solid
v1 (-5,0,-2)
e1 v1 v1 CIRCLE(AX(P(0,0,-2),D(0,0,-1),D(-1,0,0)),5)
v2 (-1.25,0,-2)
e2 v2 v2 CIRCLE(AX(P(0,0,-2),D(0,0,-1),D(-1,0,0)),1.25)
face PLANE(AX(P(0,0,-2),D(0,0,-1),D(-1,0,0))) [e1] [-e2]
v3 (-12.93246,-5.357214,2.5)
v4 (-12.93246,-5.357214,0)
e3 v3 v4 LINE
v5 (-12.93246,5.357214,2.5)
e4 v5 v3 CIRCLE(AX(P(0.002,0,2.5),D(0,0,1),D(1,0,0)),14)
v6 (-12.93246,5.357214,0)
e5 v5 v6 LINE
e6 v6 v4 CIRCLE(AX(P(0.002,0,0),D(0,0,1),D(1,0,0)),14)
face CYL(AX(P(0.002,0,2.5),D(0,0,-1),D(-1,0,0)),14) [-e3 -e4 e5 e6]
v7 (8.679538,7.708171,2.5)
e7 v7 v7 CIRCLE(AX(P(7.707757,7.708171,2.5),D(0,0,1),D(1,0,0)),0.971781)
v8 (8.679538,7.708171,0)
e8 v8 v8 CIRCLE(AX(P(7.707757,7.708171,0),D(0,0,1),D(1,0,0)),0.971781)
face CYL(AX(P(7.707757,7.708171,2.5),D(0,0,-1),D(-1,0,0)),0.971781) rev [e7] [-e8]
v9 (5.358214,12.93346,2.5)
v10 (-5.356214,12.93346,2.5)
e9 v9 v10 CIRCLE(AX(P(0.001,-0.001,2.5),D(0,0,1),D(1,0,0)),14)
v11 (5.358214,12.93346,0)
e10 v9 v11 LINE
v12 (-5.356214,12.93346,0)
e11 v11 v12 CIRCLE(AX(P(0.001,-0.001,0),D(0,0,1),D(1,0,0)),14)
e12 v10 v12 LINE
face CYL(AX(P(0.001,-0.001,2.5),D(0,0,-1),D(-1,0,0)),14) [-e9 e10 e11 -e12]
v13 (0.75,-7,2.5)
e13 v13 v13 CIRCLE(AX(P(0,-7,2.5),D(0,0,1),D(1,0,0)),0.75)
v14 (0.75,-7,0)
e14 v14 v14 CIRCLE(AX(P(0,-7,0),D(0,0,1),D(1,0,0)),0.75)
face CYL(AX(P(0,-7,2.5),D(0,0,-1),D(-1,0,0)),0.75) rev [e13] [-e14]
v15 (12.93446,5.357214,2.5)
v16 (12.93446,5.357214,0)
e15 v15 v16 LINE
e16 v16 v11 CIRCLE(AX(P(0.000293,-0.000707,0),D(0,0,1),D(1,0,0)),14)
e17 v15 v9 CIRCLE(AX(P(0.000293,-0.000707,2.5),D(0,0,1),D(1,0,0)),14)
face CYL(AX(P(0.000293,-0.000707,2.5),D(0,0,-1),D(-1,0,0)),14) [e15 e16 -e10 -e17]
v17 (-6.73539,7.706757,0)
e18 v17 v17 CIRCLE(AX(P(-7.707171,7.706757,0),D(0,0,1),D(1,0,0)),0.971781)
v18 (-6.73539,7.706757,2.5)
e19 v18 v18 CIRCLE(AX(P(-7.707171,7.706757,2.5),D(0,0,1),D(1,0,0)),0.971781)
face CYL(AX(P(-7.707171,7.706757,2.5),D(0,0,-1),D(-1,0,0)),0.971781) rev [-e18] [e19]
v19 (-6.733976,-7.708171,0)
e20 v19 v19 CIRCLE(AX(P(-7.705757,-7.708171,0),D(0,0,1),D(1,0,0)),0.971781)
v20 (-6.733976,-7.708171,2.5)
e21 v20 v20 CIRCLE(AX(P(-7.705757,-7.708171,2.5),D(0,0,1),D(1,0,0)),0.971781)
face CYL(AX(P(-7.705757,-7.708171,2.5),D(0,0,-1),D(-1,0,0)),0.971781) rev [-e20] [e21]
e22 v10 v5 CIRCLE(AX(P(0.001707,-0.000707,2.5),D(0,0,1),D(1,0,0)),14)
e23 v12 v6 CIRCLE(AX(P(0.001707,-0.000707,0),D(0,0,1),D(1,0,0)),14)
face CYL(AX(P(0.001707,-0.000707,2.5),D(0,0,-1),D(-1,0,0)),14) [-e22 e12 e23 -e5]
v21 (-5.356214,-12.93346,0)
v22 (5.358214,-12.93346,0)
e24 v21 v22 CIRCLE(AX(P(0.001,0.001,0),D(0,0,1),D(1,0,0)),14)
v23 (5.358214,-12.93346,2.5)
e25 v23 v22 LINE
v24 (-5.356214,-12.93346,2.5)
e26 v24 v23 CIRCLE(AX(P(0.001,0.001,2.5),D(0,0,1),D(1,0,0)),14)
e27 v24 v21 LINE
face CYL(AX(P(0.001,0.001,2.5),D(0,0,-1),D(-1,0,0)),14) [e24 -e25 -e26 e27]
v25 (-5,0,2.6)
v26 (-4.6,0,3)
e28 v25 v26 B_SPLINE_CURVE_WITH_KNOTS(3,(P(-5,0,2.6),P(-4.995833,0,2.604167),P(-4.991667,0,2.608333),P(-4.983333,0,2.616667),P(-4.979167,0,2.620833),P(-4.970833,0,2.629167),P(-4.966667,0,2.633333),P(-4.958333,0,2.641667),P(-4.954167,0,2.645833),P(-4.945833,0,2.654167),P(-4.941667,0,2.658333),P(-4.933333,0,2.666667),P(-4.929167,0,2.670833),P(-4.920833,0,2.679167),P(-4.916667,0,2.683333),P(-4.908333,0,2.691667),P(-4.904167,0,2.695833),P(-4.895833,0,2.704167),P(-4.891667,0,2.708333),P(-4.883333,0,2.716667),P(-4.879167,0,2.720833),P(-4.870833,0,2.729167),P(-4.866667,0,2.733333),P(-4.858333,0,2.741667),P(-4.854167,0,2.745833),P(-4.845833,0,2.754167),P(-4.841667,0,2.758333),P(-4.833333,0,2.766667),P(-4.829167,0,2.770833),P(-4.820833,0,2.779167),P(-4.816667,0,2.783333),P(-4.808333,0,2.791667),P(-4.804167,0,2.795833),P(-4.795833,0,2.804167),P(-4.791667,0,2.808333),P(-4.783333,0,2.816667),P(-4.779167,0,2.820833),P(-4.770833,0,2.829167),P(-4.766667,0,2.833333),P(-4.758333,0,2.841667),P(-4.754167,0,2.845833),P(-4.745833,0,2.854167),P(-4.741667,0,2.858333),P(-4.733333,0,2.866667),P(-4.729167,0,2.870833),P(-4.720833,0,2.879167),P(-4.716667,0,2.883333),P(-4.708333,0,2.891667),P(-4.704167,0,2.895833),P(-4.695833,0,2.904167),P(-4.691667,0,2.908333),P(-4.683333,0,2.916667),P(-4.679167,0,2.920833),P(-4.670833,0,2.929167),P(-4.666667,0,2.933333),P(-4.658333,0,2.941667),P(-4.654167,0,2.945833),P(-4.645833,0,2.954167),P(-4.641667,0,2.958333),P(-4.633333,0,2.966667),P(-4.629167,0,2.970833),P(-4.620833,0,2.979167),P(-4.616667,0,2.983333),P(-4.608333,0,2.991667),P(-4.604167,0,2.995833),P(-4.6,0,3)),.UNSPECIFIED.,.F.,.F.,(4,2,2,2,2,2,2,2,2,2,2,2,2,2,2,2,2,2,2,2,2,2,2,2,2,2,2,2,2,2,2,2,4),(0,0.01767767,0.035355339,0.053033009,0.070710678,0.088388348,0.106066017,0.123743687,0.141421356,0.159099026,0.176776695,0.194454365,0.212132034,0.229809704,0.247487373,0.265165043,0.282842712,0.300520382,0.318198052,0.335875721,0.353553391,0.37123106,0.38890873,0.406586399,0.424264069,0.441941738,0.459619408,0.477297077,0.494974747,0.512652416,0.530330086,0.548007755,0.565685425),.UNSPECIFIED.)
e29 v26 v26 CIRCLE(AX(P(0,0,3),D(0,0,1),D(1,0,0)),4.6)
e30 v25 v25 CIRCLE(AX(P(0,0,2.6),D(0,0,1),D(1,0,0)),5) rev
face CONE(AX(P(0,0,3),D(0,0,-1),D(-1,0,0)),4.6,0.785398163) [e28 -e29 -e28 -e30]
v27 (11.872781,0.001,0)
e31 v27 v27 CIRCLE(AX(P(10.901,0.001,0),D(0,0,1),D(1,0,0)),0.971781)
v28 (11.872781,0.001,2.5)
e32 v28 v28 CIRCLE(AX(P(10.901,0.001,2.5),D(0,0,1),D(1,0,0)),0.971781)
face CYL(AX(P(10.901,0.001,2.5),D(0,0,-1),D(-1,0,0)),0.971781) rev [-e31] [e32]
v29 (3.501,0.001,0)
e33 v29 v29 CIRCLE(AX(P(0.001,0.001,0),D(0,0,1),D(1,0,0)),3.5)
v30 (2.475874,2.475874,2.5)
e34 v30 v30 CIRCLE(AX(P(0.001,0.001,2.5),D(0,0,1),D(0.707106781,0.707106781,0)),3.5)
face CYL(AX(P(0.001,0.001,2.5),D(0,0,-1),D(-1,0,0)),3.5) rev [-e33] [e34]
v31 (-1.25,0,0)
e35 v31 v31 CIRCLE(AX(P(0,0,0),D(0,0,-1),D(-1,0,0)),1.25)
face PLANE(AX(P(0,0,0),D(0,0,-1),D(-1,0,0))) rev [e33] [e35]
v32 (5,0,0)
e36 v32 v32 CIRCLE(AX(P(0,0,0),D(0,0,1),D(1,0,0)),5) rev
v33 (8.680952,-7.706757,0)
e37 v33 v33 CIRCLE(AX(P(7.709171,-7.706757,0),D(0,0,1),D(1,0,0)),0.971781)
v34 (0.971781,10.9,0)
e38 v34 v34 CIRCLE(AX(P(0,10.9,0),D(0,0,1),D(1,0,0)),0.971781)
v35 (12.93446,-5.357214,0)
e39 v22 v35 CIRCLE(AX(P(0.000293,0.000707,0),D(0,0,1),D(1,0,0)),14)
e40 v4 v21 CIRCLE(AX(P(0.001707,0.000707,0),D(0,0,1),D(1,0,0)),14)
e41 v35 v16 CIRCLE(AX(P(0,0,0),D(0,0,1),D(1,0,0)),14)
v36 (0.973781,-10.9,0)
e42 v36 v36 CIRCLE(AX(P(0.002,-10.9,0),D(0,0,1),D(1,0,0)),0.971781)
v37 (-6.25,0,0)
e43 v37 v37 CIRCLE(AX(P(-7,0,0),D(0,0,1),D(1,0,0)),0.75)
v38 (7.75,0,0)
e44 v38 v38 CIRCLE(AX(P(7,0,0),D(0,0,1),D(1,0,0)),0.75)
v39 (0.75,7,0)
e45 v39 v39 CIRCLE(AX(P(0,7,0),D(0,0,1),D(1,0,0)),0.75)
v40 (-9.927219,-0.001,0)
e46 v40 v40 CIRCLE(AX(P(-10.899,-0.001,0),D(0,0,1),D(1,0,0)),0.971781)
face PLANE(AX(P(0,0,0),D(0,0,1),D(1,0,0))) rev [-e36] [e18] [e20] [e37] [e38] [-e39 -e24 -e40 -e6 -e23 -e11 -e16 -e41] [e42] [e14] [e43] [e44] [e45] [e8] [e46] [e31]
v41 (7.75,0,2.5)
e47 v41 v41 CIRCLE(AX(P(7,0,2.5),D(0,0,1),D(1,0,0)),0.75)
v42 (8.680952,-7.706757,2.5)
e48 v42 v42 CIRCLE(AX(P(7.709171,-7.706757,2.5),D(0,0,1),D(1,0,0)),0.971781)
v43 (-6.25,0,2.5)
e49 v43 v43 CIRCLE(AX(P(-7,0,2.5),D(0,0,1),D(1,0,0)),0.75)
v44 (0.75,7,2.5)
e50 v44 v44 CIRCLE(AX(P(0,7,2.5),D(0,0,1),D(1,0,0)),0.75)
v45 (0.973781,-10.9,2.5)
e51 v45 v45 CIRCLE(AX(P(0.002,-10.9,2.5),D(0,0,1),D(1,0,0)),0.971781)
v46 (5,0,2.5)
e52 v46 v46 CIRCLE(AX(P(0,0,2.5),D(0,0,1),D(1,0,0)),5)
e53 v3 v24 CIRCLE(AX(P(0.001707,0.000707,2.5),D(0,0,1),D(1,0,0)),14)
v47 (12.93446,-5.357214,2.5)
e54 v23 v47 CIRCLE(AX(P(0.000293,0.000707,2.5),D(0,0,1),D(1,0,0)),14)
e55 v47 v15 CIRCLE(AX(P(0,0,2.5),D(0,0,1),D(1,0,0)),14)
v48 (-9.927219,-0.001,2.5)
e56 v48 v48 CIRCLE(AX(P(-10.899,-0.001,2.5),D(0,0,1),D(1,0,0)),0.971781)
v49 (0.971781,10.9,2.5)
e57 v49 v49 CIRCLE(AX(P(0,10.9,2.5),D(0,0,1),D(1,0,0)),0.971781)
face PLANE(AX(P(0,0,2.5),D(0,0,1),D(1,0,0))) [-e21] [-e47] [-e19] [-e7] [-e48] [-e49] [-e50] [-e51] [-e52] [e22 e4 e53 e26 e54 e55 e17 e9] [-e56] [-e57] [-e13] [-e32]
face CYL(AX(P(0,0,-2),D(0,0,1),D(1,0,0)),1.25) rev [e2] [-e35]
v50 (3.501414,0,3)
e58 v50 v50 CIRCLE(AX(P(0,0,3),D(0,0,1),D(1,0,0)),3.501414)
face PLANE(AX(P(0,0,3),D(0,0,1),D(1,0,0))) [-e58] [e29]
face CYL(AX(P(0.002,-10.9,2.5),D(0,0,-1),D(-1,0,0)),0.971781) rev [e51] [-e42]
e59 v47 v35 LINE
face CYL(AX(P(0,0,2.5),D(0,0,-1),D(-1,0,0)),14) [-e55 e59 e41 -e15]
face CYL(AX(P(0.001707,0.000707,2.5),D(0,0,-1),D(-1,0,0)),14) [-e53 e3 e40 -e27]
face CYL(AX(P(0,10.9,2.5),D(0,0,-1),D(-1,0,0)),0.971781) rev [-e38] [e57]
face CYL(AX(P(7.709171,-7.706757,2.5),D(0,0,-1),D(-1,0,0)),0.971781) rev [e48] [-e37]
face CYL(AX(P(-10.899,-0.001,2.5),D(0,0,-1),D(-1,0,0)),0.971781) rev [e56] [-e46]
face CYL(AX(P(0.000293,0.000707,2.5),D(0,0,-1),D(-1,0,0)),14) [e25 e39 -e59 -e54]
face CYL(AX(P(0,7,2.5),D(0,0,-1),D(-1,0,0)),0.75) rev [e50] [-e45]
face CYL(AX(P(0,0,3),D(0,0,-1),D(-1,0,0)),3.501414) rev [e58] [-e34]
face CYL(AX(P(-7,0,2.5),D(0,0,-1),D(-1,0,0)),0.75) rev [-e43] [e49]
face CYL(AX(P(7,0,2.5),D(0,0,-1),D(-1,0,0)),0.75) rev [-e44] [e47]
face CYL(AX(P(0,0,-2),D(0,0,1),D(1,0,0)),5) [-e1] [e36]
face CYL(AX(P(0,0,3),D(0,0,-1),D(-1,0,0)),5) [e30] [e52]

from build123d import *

# Parameters (mm, degrees)
BOSS_EXTRUDE1_OUTLINE_R   = 0.971780714
BOSS_EXTRUDE1_OUTLINE_R_2 = 0.75
BOSS_EXTRUDE1_OUTLINE_R_3 = 3.5
BOSS_EXTRUDE1_DEPTH       = 2.5
SKETCH3_R                 = 5
SKETCH3_R_2               = 1.25
BOSS_EXTRUDE2_DEPTH       = 2
BOSS_EXTRUDE3_START       = 0.5
SKETCH4_R                 = 5
SKETCH4_R_2               = 3.501414214
BOSS_EXTRUDE3_DEPTH       = 0.5
CHAMFER1_SIZE             = 0.4


# Read off the part's stored shape, not the designer's step: Boss-Extrude1
with BuildPart() as part:
    # Boss-Extrude1 outline → Boss-Extrude1 (new body)
    with BuildSketch(Plane.XY):
        with BuildLine():
            ThreePointArc((5.358214498, 12.933459897), (0.001, 13.999), (-5.356214498, 12.933459897))
            ThreePointArc((-5.356214498, 12.933459897), (-9.89778783, 9.89878783), (-12.932459897, 5.357214498))
            ThreePointArc((-12.932459897, 5.357214498), (-13.998, 0), (-12.932459897, -5.357214498))
            ThreePointArc((-12.932459897, -5.357214498), (-9.89778783, -9.89878783), (-5.356214498, -12.933459897))
            ThreePointArc((-5.356214498, -12.933459897), (0.001, -13.999), (5.358214498, -12.933459897))
            ThreePointArc((5.358214498, -12.933459897), (9.89978783, -9.89878783), (12.934459897, -5.357214498))
            ThreePointArc((12.934459897, -5.357214498), (14, 0), (12.934459897, 5.357214498))
            ThreePointArc((12.934459897, 5.357214498), (9.89978783, 9.89878783), (5.358214498, 12.933459897))
        make_face()
        with Locations((-7.705756808, -7.708171022)):
            Circle(BOSS_EXTRUDE1_OUTLINE_R, mode=Mode.SUBTRACT)
        with Locations((0, -7)):
            Circle(BOSS_EXTRUDE1_OUTLINE_R_2, mode=Mode.SUBTRACT)
        with Locations((-10.899, -0.001)):
            Circle(BOSS_EXTRUDE1_OUTLINE_R, mode=Mode.SUBTRACT)
        with Locations((0.002, -10.9)):
            Circle(BOSS_EXTRUDE1_OUTLINE_R, mode=Mode.SUBTRACT)
        with Locations((7.709171022, -7.706756808)):
            Circle(BOSS_EXTRUDE1_OUTLINE_R, mode=Mode.SUBTRACT)
        with Locations((-7, 0)):
            Circle(BOSS_EXTRUDE1_OUTLINE_R_2, mode=Mode.SUBTRACT)
        with Locations((-7.707171022, 7.706756808)):
            Circle(BOSS_EXTRUDE1_OUTLINE_R, mode=Mode.SUBTRACT)
        with Locations((0, 7)):
            Circle(BOSS_EXTRUDE1_OUTLINE_R_2, mode=Mode.SUBTRACT)
        with Locations((0, 10.9)):
            Circle(BOSS_EXTRUDE1_OUTLINE_R, mode=Mode.SUBTRACT)
        with Locations((0.001, 0.001)):
            Circle(BOSS_EXTRUDE1_OUTLINE_R_3, mode=Mode.SUBTRACT)
        with Locations((7, 0)):
            Circle(BOSS_EXTRUDE1_OUTLINE_R_2, mode=Mode.SUBTRACT)
        with Locations((10.901, 0.001)):
            Circle(BOSS_EXTRUDE1_OUTLINE_R, mode=Mode.SUBTRACT)
        with Locations((7.707756808, 7.708171022)):
            Circle(BOSS_EXTRUDE1_OUTLINE_R, mode=Mode.SUBTRACT)
    extrude(amount=BOSS_EXTRUDE1_DEPTH)

    # Sketch3 → Boss-Extrude2 (add)
    with BuildSketch(Plane(origin=(0, 0, 0), x_dir=(-1, 0, 0), z_dir=(0, 0, -1))):
        with Locations(Location((0, 0, 0), (0, 0, 180))):
            Circle(SKETCH3_R)
        Circle(SKETCH3_R_2, mode=Mode.SUBTRACT)
    extrude(amount=BOSS_EXTRUDE2_DEPTH)

    # Sketch4 → Boss-Extrude3 (add)
    with BuildSketch(Plane.XY.offset(2.5).offset(BOSS_EXTRUDE3_START)):
        Circle(SKETCH4_R)
        with Locations(Location((0, 0, 0), (0, 0, 45))):
            Circle(SKETCH4_R_2, mode=Mode.SUBTRACT)
    extrude(amount=-BOSS_EXTRUDE3_DEPTH)

    # Chamfer1
    chamfer1_edges = [part.edges().sort_by_distance(p)[0] for p in [
        (-5, 0, 3),
    ]]
    chamfer(chamfer1_edges, length=CHAMFER1_SIZE)


solid = part.part
